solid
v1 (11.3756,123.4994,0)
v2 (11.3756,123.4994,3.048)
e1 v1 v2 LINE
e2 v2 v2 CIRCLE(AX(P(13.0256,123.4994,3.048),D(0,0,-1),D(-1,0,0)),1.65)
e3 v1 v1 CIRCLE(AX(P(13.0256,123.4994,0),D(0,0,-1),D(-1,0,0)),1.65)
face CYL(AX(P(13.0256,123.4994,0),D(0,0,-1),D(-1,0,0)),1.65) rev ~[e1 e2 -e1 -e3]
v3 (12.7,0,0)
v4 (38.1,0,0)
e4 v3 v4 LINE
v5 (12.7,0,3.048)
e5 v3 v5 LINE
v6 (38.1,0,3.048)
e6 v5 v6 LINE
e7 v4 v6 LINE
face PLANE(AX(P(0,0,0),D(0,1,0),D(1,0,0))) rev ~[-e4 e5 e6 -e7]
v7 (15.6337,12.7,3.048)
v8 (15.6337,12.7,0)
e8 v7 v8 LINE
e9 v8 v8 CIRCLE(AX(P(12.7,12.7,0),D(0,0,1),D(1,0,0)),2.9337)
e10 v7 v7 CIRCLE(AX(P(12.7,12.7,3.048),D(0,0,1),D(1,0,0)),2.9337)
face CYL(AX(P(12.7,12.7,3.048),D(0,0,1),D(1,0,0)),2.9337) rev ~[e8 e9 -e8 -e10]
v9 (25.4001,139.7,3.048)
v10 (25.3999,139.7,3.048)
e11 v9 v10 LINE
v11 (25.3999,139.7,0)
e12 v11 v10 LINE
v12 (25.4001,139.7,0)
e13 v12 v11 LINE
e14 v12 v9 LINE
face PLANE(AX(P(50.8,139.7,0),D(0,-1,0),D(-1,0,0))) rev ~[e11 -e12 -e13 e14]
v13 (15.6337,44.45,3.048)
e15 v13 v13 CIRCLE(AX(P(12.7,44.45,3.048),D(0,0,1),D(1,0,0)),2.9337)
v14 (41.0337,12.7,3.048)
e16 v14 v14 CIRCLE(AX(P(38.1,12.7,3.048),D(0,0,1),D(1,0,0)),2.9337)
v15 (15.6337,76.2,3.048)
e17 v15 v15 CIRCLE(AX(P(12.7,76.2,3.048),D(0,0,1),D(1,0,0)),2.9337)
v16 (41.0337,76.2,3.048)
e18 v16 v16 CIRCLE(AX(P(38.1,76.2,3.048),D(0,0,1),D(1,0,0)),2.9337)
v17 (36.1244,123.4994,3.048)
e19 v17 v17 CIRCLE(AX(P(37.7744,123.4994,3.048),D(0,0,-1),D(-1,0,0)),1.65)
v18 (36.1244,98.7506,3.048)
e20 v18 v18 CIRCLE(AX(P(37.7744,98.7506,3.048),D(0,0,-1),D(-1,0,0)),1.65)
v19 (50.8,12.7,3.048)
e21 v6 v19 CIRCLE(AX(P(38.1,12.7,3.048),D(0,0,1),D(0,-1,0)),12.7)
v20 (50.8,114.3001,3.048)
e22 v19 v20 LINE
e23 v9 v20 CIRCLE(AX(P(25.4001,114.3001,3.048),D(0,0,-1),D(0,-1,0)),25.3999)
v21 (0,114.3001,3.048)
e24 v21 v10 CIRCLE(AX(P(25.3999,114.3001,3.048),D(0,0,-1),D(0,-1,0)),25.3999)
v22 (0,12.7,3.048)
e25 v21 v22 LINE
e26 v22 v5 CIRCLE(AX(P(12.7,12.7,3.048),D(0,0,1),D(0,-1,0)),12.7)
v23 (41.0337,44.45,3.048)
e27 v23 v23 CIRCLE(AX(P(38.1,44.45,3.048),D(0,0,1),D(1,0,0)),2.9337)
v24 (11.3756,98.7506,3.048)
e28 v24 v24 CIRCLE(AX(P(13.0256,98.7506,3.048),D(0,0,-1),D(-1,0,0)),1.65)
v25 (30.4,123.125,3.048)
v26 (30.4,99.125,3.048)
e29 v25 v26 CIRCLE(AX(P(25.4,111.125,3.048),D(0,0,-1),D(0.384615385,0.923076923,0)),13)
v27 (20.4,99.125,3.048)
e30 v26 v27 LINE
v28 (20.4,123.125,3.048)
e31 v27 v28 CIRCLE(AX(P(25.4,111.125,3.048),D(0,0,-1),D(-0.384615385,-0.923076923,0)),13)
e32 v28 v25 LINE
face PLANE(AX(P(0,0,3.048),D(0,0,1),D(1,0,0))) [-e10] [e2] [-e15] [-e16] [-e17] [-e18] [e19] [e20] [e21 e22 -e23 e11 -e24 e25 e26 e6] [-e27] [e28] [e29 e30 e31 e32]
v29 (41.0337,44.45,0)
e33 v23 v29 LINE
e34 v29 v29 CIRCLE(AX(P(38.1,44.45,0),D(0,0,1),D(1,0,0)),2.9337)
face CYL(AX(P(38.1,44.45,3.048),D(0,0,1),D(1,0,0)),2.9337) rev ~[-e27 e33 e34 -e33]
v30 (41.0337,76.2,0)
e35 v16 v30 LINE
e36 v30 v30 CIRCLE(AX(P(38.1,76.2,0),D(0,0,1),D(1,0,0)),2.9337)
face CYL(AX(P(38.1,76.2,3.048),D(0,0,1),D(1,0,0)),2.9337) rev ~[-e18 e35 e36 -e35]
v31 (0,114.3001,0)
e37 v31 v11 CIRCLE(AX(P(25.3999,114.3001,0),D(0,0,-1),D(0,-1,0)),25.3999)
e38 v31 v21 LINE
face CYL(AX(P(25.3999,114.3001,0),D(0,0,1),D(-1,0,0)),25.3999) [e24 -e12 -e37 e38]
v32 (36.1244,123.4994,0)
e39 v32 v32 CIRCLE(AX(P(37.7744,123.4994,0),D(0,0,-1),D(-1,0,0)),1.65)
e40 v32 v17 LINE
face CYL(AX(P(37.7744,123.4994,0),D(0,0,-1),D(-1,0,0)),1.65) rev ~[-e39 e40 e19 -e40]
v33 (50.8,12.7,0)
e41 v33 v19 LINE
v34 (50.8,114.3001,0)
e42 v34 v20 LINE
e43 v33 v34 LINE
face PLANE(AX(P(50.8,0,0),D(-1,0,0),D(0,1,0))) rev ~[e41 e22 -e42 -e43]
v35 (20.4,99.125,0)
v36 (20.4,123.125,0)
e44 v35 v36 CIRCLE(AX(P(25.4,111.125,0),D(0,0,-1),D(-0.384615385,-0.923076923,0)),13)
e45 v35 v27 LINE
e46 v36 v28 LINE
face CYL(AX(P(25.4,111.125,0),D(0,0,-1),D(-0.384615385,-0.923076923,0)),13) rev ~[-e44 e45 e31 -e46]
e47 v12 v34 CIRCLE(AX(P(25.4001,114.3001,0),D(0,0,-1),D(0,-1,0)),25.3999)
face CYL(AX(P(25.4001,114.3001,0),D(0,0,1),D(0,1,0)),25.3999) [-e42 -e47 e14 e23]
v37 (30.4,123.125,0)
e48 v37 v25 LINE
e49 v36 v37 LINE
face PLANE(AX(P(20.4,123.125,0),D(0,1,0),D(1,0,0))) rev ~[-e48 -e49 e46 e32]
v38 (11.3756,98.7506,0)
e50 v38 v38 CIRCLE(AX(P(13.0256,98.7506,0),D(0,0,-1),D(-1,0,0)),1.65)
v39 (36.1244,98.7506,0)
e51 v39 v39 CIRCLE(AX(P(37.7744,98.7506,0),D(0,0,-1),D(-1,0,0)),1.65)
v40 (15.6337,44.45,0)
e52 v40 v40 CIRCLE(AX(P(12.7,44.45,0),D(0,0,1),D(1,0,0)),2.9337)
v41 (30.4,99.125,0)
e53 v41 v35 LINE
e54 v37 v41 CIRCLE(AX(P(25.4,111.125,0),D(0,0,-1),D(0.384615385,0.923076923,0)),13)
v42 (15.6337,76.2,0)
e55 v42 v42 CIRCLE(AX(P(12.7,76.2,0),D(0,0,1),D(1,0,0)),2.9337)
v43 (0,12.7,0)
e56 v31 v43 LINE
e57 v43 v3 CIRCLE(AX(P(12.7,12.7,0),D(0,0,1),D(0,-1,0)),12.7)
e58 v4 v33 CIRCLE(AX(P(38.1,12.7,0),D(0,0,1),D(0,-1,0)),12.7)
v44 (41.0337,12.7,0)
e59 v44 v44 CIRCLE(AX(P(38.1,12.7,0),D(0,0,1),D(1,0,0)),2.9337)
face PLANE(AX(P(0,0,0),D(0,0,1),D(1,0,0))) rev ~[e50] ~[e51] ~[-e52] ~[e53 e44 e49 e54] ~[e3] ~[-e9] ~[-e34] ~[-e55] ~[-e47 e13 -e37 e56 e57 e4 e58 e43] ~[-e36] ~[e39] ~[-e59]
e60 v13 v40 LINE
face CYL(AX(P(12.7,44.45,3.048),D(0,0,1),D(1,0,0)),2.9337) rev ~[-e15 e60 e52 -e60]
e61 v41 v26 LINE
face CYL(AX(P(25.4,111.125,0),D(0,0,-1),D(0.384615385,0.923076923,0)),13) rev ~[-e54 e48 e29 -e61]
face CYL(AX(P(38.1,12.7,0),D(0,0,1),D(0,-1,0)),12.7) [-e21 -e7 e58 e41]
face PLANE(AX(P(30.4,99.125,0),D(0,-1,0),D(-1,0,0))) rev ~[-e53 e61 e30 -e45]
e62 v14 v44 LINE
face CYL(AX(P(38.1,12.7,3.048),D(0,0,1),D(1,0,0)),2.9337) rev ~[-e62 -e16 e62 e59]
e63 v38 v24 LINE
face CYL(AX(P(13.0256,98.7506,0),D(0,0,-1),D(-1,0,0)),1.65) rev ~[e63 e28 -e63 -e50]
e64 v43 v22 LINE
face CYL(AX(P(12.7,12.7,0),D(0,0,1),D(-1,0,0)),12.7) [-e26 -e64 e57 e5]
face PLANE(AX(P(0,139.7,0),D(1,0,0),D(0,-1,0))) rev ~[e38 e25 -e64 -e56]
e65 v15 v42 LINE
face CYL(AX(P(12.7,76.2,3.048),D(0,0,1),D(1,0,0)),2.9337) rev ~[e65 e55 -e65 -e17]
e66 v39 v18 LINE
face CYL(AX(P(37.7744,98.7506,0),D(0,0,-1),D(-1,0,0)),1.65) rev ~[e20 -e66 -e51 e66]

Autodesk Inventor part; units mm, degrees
ref_plane "YZ Plane" through (0, 0, 0) normal (1, 0, 0) x (0, 1, 0)
ref_plane "XZ Plane" through (0, 0, 0) normal (0, 1, 0) x (-1, 0, 0)
ref_plane "XY Plane" through (0, 0, 0) normal (0, 0, 1) x (1, 0, 0)
sketch "Sketch1" plane through (0, 0, 0) normal (0, 0, 1) x (1, 0, 0)
  line L0 (0, 0) -> (50.8, 0)
  line L1 (50.8, 0) -> (50.8, 139.7)
  line L2 (50.8, 139.7) -> (0, 139.7)
  line L3 (0, 139.7) -> (0, 0)
  dimension "d0" = 50.8
  dimension "d1" = 139.7
extrude "Plate1" add sketch "Sketch1" along normal blind 3.048
fillet "Corner Round1" radius 25.4 1 edges at (50.8, 139.7, 1.524)
fillet "Corner Round1" radius 25.4 1 edges at (0, 139.7, 1.524)
fillet "Corner Round2" radius 12.7 2 edges at (50.8, 0, 1.524) (0, 0, 1.524)
sketch "Sketch2" plane through (0, 0, 0) normal (0, 0, -1) x (-1, 0, 0)
  arc A0 (-20.4, 99.125) -> (-20.4, 123.125) centre (-25.4, 111.125) ccw projected
  line L0 (-20.4, 123.125) -> (-30.4, 123.125) projected
  line L1 (-30.4, 99.125) -> (-20.4, 99.125) projected
  arc A1 (-30.4, 123.125) -> (-30.4, 99.125) centre (-25.4, 111.125) ccw projected
  circle A2 centre (-13.0256, 98.7506) radius 1.65 projected
  circle A3 centre (-37.7744, 123.4994) radius 1.65 projected
  circle A4 centre (-13.0256, 123.4994) radius 1.65 projected
  circle A5 centre (-37.7744, 98.7506) radius 1.65 projected
  point P0 (0, 0)
extrude "Extrusion1" cut sketch "Sketch2" against normal up to surface (3.048 mm away)
sketch "Sketch3" plane through (0, 0, 3.048) normal (0, 0, 1) x (1, 0, 0)
  circle A0 centre (12.7, 76.2) radius 2.9337 projected
  circle A1 centre (38.1, 76.2) radius 2.9337 projected
  circle A2 centre (38.1, 44.45) radius 2.9337 projected
  circle A3 centre (12.7, 44.45) radius 2.9337 projected
  circle A4 centre (12.7, 12.7) radius 2.9337 projected
  circle A5 centre (38.1, 12.7) radius 2.9337 projected
  circle A6 centre (12.7, 12.7) radius 2.9337 projected
  point P0 (0, 0)
extrude "Extrusion2" cut sketch "Sketch3" against normal up to surface (3.048 mm away)
equation "\"d10\" = Thickness"
equation "\"BendRadius\" = Thickness"
equation "\"BendReliefWidth\" = Thickness"
equation "\"BendReliefDepth\" = 0.5 * Thickness"
equation "\"CornerReliefSize\" = 4 * Thickness"
equation "\"MinimumRemnant\" = 2 * Thickness"
equation "\"TransitionRadius\" = BendRadius"
equation "\"JacobiRadiusSize\" = Thickness"
equation "\"GapSize\" = Thickness"
equation "\"d2\" = BendRadius"
equation "\"Thickness\" = 3.048"
properties part number "pG188Mount"
